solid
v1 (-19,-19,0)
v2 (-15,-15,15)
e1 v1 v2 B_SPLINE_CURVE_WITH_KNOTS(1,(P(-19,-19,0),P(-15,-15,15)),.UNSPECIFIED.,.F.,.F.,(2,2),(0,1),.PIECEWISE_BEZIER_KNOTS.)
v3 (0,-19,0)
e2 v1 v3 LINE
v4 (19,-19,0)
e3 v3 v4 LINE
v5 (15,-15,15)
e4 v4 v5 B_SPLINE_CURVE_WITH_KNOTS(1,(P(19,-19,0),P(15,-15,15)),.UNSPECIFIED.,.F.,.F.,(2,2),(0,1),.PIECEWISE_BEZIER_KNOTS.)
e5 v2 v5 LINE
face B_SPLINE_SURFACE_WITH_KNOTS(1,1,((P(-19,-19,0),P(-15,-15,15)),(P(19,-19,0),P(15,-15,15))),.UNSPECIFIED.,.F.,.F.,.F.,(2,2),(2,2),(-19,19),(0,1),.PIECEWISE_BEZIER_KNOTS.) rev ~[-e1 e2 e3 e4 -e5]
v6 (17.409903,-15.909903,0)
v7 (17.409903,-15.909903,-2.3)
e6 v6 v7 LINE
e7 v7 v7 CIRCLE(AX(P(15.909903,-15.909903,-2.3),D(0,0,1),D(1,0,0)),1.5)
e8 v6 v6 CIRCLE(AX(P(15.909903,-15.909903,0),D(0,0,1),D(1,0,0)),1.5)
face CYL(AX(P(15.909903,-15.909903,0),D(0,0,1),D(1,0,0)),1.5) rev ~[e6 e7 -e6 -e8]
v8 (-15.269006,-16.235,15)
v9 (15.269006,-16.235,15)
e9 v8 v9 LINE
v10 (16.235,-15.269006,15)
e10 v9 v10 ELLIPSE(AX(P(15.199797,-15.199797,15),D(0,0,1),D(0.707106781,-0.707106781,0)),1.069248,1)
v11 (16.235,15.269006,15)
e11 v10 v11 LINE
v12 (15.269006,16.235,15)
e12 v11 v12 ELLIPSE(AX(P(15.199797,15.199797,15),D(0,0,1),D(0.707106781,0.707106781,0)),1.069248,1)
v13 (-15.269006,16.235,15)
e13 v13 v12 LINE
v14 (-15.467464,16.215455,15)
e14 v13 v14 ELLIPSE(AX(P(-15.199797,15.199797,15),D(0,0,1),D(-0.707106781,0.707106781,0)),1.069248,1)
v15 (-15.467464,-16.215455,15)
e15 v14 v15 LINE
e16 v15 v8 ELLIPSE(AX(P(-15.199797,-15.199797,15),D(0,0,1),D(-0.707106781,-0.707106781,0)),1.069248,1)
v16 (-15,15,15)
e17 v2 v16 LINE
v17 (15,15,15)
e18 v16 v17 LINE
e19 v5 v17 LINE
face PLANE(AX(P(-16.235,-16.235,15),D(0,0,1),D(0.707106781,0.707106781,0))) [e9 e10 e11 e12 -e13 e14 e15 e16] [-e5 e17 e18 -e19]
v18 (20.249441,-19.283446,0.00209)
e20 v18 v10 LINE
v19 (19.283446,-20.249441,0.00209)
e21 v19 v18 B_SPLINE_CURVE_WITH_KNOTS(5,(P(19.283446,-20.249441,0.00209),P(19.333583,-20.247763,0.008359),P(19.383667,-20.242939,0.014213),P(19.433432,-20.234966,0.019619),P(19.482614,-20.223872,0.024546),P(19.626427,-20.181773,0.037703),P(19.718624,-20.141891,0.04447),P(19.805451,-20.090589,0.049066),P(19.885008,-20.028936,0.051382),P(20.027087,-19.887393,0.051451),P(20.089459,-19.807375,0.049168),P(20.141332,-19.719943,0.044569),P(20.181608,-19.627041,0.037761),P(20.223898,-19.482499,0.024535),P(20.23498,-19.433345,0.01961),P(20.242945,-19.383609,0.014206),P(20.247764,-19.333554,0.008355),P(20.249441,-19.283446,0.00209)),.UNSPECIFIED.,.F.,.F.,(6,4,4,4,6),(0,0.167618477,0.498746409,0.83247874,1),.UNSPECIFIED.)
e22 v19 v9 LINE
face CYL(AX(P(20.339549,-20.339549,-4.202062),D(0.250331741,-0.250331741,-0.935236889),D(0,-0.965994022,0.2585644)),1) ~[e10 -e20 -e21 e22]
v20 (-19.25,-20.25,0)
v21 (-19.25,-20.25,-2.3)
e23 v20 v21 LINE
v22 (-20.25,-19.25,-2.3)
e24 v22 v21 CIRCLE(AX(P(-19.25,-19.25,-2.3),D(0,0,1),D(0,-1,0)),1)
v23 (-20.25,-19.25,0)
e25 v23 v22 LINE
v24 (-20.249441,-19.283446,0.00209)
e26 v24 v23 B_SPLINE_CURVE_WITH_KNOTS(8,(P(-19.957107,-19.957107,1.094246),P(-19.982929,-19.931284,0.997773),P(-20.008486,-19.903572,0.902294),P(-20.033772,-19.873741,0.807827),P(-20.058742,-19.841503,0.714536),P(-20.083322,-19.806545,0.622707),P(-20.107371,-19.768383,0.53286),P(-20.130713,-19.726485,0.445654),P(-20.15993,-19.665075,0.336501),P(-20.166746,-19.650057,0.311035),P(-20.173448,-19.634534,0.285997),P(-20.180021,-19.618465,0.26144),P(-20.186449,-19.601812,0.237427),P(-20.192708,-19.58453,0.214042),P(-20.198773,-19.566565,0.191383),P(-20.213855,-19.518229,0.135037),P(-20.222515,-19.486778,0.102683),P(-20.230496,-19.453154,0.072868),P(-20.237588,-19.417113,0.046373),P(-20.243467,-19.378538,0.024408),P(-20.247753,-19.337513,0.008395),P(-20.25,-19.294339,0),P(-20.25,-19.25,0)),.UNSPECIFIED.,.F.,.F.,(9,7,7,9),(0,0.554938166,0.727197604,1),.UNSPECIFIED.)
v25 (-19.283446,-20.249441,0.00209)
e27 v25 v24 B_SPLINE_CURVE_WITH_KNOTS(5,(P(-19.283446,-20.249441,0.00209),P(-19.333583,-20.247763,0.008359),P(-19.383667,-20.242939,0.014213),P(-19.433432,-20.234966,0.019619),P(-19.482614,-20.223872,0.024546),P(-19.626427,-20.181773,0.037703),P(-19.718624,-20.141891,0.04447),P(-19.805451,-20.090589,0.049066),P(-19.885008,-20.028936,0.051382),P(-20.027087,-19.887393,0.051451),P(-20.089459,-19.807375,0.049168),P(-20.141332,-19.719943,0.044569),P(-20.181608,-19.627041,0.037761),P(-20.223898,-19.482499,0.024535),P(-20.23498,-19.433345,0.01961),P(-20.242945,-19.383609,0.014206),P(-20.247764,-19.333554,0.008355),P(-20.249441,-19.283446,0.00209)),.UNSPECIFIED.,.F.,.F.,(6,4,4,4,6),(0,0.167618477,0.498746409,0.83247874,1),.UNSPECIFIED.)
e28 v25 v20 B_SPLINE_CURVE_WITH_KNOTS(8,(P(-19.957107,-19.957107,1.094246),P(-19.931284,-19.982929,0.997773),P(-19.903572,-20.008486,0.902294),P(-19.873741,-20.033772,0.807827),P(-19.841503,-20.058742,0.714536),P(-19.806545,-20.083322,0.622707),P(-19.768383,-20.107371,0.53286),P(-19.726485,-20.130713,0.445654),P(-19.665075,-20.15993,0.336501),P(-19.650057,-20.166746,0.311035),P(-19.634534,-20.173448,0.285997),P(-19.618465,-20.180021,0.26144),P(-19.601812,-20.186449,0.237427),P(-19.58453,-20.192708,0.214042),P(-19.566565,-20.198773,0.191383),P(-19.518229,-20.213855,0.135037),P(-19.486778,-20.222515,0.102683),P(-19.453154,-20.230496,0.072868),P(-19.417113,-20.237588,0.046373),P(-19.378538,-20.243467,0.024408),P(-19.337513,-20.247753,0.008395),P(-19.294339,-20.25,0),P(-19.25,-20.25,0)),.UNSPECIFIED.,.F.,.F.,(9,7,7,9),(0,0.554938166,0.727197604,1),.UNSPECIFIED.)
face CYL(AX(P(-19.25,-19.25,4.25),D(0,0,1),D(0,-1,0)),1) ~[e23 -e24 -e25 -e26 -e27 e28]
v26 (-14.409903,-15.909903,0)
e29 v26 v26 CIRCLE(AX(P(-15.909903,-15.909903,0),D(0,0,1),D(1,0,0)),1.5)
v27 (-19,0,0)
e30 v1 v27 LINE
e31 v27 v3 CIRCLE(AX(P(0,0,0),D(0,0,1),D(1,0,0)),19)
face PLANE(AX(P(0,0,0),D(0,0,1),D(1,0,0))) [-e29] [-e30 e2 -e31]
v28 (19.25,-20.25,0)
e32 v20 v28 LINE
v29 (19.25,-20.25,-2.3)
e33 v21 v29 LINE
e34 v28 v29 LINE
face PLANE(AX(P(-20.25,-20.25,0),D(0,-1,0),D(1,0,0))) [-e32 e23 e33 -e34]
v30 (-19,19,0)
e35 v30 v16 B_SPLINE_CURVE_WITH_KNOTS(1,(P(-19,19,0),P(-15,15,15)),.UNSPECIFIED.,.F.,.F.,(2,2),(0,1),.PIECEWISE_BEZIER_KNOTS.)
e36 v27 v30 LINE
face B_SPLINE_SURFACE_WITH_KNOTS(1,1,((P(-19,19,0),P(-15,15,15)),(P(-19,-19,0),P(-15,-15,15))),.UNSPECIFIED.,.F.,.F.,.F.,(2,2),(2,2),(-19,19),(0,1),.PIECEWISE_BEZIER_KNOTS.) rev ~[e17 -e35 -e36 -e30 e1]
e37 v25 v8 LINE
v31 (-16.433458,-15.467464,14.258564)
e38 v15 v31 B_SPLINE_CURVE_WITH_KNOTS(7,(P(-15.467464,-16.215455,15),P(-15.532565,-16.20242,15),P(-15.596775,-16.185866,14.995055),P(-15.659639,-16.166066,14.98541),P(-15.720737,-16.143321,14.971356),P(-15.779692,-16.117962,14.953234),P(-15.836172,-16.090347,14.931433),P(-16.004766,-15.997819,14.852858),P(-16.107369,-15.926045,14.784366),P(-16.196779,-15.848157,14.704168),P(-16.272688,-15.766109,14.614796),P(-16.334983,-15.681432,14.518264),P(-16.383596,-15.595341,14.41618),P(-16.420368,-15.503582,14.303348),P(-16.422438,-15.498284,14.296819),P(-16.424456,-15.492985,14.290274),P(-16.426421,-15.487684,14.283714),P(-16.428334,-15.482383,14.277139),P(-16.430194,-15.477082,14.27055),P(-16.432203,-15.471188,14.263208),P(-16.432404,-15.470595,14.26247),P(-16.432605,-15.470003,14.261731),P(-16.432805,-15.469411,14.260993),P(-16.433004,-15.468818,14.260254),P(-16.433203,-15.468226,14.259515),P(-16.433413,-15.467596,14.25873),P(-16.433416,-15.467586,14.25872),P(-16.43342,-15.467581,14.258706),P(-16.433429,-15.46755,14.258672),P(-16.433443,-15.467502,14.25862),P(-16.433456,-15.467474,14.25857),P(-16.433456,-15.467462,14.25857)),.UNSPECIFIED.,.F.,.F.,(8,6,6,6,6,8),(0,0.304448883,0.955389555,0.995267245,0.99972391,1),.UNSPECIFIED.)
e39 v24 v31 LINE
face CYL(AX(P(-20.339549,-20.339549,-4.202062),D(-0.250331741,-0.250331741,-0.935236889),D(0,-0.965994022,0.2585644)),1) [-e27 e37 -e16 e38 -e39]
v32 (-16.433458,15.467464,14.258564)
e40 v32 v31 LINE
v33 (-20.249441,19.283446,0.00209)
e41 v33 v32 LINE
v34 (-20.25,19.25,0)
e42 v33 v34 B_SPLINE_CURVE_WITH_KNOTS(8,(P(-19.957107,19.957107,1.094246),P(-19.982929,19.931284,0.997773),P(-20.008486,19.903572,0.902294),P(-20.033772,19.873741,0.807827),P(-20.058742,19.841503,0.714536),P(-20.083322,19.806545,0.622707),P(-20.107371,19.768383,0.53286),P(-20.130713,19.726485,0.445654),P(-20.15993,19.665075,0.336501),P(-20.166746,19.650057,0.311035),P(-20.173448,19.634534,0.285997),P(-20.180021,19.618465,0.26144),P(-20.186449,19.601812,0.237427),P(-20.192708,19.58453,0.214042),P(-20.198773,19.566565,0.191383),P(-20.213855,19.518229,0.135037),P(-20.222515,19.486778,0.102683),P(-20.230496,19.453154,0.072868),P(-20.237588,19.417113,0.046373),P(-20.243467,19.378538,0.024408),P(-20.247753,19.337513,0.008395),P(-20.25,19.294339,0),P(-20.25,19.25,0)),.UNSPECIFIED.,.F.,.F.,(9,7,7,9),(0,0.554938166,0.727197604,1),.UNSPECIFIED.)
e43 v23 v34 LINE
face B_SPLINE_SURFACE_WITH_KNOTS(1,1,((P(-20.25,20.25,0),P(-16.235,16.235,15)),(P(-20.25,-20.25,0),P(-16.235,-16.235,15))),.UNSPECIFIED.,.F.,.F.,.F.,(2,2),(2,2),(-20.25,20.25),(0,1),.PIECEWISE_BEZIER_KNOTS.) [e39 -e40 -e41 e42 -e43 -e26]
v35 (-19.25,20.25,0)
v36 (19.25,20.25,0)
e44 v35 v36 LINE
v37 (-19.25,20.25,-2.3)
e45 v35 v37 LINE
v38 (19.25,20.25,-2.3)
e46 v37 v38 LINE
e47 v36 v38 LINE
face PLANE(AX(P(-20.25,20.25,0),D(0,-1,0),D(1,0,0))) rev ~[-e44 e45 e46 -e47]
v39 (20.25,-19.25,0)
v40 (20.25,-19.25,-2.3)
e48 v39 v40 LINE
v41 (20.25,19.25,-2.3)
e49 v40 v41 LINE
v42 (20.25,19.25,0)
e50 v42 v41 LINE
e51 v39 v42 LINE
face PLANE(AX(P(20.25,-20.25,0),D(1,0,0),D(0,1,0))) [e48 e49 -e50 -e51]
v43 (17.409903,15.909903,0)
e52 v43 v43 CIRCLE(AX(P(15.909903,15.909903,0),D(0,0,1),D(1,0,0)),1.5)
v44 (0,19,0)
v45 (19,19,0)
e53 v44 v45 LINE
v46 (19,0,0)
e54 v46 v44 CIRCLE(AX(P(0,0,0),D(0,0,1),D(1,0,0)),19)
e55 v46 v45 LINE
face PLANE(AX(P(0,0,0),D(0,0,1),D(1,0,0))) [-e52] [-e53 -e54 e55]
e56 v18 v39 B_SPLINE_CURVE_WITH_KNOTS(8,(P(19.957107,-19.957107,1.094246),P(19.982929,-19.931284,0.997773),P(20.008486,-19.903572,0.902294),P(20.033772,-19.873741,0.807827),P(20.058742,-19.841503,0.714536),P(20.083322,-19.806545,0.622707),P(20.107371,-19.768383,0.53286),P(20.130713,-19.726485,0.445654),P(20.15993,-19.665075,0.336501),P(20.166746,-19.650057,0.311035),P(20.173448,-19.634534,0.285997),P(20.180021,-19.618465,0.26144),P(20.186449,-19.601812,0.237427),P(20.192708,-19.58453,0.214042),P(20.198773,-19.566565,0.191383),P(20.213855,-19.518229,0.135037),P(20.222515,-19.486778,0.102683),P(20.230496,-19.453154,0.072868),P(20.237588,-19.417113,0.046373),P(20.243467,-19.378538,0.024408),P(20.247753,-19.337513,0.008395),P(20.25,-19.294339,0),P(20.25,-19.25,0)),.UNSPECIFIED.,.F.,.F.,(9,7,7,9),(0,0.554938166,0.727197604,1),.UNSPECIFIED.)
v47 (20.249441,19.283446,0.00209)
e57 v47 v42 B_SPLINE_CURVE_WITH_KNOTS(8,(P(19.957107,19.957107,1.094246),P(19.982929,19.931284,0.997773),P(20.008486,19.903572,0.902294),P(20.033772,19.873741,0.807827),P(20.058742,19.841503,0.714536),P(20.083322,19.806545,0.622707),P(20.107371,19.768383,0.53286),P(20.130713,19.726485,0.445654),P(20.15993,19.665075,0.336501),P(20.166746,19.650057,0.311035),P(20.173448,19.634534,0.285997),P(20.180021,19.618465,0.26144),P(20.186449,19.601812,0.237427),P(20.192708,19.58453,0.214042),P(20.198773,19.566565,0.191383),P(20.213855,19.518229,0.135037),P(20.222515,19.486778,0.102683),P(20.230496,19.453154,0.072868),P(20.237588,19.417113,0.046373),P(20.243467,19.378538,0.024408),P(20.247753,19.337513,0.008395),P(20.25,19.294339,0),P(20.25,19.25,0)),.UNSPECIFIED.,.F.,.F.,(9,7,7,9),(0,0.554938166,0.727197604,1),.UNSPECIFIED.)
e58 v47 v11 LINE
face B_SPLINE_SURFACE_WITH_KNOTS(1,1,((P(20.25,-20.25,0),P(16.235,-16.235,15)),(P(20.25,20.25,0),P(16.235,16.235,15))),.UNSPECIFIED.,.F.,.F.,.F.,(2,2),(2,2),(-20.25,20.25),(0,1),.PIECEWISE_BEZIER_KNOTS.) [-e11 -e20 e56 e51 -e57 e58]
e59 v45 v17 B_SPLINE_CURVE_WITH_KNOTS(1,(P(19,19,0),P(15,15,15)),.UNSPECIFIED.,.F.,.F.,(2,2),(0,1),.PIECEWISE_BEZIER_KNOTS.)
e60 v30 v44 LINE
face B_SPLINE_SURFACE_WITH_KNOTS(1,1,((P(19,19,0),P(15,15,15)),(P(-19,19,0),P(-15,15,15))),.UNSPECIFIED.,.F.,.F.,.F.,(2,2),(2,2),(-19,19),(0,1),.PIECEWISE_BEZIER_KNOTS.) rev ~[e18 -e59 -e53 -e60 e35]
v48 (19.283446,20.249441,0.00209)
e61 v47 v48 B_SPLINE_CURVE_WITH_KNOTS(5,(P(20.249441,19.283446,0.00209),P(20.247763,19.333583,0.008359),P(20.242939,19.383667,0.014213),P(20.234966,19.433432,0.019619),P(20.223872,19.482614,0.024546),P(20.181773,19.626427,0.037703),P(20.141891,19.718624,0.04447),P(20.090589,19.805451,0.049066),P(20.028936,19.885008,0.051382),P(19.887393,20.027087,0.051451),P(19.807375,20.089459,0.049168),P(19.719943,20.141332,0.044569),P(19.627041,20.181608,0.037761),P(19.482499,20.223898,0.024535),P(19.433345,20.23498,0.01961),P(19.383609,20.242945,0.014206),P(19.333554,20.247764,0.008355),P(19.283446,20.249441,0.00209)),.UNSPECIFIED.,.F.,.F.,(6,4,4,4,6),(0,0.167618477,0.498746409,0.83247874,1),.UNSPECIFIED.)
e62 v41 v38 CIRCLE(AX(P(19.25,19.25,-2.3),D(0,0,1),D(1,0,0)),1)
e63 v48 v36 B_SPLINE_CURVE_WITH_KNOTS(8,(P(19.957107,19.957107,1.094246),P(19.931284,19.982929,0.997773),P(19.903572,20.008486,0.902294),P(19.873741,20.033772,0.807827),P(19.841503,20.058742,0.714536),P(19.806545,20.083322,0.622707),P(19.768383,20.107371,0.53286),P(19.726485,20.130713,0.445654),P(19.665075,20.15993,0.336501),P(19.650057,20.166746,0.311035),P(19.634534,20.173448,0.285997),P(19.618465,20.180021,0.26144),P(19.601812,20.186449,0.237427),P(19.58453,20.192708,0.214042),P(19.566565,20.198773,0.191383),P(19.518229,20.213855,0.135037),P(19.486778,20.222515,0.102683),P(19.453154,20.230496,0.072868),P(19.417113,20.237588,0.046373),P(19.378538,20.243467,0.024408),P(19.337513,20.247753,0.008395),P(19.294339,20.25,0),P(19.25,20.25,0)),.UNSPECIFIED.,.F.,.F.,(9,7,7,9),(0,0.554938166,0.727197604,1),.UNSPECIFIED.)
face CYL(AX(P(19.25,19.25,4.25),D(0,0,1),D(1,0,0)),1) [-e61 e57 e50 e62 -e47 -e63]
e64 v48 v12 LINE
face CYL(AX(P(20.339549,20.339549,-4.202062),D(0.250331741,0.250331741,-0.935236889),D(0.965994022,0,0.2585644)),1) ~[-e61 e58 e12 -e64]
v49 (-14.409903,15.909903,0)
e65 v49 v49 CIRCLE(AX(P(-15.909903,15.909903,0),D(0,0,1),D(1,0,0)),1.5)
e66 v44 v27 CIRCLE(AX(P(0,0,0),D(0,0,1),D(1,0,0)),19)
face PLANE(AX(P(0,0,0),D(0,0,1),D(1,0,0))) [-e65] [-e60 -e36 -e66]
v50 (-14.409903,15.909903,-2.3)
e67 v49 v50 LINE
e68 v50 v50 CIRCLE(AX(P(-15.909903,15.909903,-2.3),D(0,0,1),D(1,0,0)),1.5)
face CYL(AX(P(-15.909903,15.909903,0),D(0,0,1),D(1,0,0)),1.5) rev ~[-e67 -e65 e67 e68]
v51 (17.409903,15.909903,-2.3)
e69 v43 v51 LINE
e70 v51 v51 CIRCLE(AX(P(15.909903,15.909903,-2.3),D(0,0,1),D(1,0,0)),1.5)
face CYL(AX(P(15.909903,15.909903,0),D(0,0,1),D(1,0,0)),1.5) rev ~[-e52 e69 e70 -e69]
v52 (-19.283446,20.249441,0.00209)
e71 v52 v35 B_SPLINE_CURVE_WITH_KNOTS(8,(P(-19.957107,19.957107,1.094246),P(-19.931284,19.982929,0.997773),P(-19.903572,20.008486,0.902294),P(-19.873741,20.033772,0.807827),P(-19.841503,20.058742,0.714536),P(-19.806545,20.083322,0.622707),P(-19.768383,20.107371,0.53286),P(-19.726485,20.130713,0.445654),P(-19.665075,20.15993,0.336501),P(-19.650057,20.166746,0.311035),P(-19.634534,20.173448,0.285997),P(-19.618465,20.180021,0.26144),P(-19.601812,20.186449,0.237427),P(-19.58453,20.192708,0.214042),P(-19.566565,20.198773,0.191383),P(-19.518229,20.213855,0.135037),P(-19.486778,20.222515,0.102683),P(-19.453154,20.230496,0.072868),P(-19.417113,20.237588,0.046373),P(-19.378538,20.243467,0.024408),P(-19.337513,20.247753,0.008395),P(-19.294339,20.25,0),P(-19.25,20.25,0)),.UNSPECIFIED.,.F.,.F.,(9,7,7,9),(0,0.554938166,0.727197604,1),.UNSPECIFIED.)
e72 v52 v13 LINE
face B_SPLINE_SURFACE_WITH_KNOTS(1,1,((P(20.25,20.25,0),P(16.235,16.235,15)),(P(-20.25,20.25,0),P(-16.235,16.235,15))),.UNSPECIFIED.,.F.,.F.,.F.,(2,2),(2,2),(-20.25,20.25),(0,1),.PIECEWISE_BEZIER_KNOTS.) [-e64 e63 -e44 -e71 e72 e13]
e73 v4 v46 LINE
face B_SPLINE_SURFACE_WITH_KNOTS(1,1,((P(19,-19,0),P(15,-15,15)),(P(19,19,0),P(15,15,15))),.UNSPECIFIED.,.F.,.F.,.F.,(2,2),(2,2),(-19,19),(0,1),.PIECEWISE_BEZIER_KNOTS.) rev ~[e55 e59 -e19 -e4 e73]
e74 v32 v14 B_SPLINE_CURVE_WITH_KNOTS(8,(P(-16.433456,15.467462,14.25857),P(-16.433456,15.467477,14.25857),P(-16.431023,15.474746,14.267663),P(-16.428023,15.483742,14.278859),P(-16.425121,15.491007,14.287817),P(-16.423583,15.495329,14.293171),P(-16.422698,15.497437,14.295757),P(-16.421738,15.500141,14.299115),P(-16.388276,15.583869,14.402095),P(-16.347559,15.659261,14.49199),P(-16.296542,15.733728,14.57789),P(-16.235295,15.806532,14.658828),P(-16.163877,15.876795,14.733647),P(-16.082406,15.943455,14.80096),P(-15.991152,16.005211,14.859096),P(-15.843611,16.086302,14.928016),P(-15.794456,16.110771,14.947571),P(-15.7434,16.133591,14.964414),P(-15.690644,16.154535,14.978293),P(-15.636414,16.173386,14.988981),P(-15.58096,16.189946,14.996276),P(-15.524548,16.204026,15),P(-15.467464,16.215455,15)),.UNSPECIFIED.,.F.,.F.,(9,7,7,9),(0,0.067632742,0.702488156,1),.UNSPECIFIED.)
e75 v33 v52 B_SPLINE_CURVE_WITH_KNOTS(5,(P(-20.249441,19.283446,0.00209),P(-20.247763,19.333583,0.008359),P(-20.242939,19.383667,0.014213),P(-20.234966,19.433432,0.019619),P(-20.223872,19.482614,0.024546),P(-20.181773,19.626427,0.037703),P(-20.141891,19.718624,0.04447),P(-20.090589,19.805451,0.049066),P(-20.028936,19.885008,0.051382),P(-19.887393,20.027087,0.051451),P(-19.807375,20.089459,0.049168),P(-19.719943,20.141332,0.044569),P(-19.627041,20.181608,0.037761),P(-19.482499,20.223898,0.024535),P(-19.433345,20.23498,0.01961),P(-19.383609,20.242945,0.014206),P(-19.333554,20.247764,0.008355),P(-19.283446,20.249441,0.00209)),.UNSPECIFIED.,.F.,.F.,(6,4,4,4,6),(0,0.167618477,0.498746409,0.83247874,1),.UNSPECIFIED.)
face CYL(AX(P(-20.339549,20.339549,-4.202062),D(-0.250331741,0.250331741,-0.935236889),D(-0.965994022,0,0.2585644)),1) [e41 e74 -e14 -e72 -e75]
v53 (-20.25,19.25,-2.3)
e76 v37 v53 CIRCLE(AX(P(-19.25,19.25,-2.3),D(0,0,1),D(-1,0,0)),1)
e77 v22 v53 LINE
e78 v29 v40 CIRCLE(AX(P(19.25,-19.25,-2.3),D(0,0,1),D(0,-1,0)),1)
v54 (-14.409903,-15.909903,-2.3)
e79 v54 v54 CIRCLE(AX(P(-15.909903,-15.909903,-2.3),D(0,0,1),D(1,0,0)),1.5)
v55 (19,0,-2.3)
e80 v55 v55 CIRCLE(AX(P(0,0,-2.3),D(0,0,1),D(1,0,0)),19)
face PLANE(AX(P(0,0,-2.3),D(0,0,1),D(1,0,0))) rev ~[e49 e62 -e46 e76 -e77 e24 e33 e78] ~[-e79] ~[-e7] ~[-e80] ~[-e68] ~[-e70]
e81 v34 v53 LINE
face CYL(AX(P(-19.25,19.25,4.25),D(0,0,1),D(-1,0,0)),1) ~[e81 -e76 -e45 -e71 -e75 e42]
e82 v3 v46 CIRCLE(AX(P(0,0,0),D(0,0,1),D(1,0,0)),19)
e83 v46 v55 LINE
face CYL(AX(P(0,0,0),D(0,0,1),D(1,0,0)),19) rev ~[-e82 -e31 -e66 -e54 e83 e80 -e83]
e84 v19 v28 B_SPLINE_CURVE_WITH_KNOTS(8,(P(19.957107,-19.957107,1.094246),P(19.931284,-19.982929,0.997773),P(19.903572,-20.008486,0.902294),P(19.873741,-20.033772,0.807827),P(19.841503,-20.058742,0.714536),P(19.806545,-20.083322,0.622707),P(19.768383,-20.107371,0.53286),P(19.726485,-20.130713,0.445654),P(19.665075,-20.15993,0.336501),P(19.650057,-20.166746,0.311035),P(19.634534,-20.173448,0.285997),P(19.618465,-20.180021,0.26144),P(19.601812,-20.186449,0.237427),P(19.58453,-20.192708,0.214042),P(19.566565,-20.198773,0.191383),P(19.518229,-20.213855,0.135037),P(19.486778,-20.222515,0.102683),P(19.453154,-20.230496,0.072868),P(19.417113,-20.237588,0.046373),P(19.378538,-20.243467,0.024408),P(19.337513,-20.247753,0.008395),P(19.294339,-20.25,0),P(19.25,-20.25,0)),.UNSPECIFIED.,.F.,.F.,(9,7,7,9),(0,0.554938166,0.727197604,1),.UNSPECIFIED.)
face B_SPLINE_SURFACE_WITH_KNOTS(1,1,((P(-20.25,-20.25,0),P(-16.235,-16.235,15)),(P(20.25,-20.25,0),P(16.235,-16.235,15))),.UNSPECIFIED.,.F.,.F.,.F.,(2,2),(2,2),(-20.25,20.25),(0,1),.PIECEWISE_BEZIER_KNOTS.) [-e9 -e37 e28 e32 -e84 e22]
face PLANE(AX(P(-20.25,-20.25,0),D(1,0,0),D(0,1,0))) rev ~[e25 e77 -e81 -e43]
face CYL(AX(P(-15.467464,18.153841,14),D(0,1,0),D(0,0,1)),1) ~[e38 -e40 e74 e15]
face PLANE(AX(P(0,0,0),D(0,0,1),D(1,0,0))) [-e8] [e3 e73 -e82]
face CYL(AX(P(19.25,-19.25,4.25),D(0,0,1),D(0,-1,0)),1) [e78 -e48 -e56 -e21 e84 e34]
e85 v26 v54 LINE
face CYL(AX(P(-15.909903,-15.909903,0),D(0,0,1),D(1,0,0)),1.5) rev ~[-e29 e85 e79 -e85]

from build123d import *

# Parameters (mm, degrees)
F0_W         = 40.5
F0_H         = 40.5
F2_W         = 32.47
F2_H         = 32.47
F4_W         = 38
F4_H         = 38
F5_W         = 30
F5_H         = 30
F7_W         = 40.5
F7_H         = 40.5
F7_R         = 1.5
F7_R_2       = 19
F8_DEPTH     = 2.3
F9_T3_DEPTH  = 22.3515662211
F9_T6_DEPTH  = 9.05
F9_T9_DEPTH  = 9.05
F9_T12_DEPTH = 22.3515662211
F9_T15_DEPTH = 22.3515662211
F9_T18_DEPTH = 9.05
F9_T21_DEPTH = 22.3515662211
F9_T24_DEPTH = 9.05
F9_T27_DEPTH = 36.3076821333


# Not quite as in the source:
# - a fillet or chamfer that OpenCascade refuses, or shapes differently, is made with other operations: its cross-section is extruded or revolved along the edge and cut away or added


with BuildPart() as f3:
    # F0 (on Top) → F3 section 0
    with BuildSketch(Plane.XY):
        Rectangle(F0_W, F0_H)
    # F2 (on offset) → F3 section 1
    with BuildSketch(Plane.XY.offset(15)):
        Rectangle(F2_W, F2_H)
    loft()

    # F4 (on face) → F6 section 0
    with BuildSketch(Plane.XY):
        Rectangle(F4_W, F4_H)
    # F5 (on face) → F6 section 1
    with BuildSketch(Plane.XY.offset(15)):
        Rectangle(F5_W, F5_H)
    loft(mode=Mode.SUBTRACT)

    # F7 (on face) → F8 (join)
    with BuildSketch(Plane.XY):
        Rectangle(F7_W, F7_H)
        with Locations((-15.9099025767, -15.9099025767)):
            Circle(F7_R, mode=Mode.SUBTRACT)
        with Locations((15.9099025767, -15.9099025767)):
            Circle(F7_R, mode=Mode.SUBTRACT)
        with Locations((-15.9099025767, 15.9099025767)):
            Circle(F7_R, mode=Mode.SUBTRACT)
        Circle(F7_R_2, mode=Mode.SUBTRACT)
        with Locations((15.9099025767, 15.9099025767)):
            Circle(F7_R, mode=Mode.SUBTRACT)
    extrude(amount=-F8_DEPTH)

    # F9: fillet of radius 1 on 9 edges, made by hand


with BuildPart() as f9_tool1:
    # F9_s2 → F9_t3 (new body)
    with BuildSketch(Plane(origin=(-3.5329799901, -3.5329799901, -13.1991780453), x_dir=(-0.7071067812, 0.7071067812, 0), z_dir=(0.2503317407, 0.2503317407, 0.9352368893))):
        with BuildLine():
            ThreePointArc((-0.6830609237, 26.1443262584), (0, 26.4139648585), (0.6830609237, 26.1443262584))
            Line((0.6830609237, 26.1443262584), (0, 26.783150032))
            Line((0, 26.783150032), (-0.6830609237, 26.1443262584))
        make_face()
    extrude(amount=F9_T3_DEPTH)


with BuildPart() as f9_tool4:
    # F9_s5 → F9_t6 (new body)
    with BuildSketch(Plane.XY.offset(4.25)):
        with BuildLine():
            ThreePointArc((-19.25, -20.25), (-19.9571067812, -19.9571067812), (-20.25, -19.25))
            Line((-20.25, -19.25), (-20.25, -20.25))
            Line((-20.25, -20.25), (-19.25, -20.25))
        make_face()
    extrude(amount=-F9_T6_DEPTH)


with BuildPart() as f9_tool7:
    # F9_s8 → F9_t9 (new body)
    with BuildSketch(Plane.XY.offset(4.25)):
        with BuildLine():
            ThreePointArc((-20.25, 19.25), (-19.9571067812, 19.9571067812), (-19.25, 20.25))
            Line((-19.25, 20.25), (-20.25, 20.25))
            Line((-20.25, 20.25), (-20.25, 19.25))
        make_face()
    extrude(amount=-F9_T9_DEPTH)


with BuildPart() as f9_tool10:
    # F9_s11 → F9_t12 (new body)
    with BuildSketch(Plane(origin=(-3.5329799901, 3.5329799901, -13.1991780453), x_dir=(0.7071067812, 0.7071067812, 0), z_dir=(0.2503317407, -0.2503317407, 0.9352368893))):
        with BuildLine():
            ThreePointArc((-0.6830609237, 26.1443262584), (0, 26.4139648585), (0.6830609237, 26.1443262584))
            Line((0.6830609237, 26.1443262584), (0, 26.783150032))
            Line((0, 26.783150032), (-0.6830609237, 26.1443262584))
        make_face()
    extrude(amount=F9_T12_DEPTH)


with BuildPart() as f9_tool13:
    # F9_s14 → F9_t15 (new body)
    with BuildSketch(Plane(origin=(3.5329799901, 3.5329799901, -13.1991780453), x_dir=(0.7071067812, -0.7071067812, 0), z_dir=(-0.2503317407, -0.2503317407, 0.9352368893))):
        with BuildLine():
            ThreePointArc((0.6830609237, 26.1443262584), (0, 26.4139648585), (-0.6830609237, 26.1443262584))
            Line((-0.6830609237, 26.1443262584), (0, 26.783150032))
            Line((0, 26.783150032), (0.6830609237, 26.1443262584))
        make_face()
    extrude(amount=F9_T15_DEPTH)


with BuildPart() as f9_tool16:
    # F9_s17 → F9_t18 (new body)
    with BuildSketch(Plane.XY.offset(4.25)):
        with BuildLine():
            ThreePointArc((20.25, 19.25), (19.9571067812, 19.9571067812), (19.25, 20.25))
            Line((19.25, 20.25), (20.25, 20.25))
            Line((20.25, 20.25), (20.25, 19.25))
        make_face()
    extrude(amount=-F9_T18_DEPTH)


with BuildPart() as f9_tool19:
    # F9_s20 → F9_t21 (new body)
    with BuildSketch(Plane(origin=(3.5329799901, -3.5329799901, -13.1991780453), x_dir=(-0.7071067812, -0.7071067812, 0), z_dir=(-0.2503317407, 0.2503317407, 0.9352368893))):
        with BuildLine():
            ThreePointArc((0.6830609237, 26.1443262584), (0, 26.4139648585), (-0.6830609237, 26.1443262584))
            Line((-0.6830609237, 26.1443262584), (0, 26.783150032))
            Line((0, 26.783150032), (0.6830609237, 26.1443262584))
        make_face()
    extrude(amount=F9_T21_DEPTH)


with BuildPart() as f9_tool22:
    # F9_s23 → F9_t24 (new body)
    with BuildSketch(Plane.XY.offset(4.25)):
        with BuildLine():
            ThreePointArc((19.25, -20.25), (19.9571067812, -19.9571067812), (20.25, -19.25))
            Line((20.25, -19.25), (20.25, -20.25))
            Line((20.25, -20.25), (19.25, -20.25))
        make_face()
    extrude(amount=-F9_T24_DEPTH)


with BuildPart() as f9_tool25:
    # F9_s26 → F9_t27 (new body)
    with BuildSketch(Plane.XZ.offset(-18.1538410667)):
        with BuildLine():
            ThreePointArc((-15.4674635733, 15), (-16.0763295685, 14.7932730929), (-16.4334575956, 14.2585644))
            Line((-16.4334575956, 14.2585644), (-16.235, 15))
            Line((-16.235, 15), (-15.4674635733, 15))
        make_face()
    extrude(amount=F9_T27_DEPTH)


with BuildPart() as f3_1:
    add(f3.part)

    # F9_t28: cut F9_tool1, F9_tool4, F9_tool7, F9_tool10, F9_tool13, F9_tool16, F9_tool19, F9_tool22, F9_tool25
    add([f9_tool1.part, f9_tool4.part, f9_tool7.part, f9_tool10.part, f9_tool13.part, f9_tool16.part, f9_tool19.part, f9_tool22.part, f9_tool25.part], mode=Mode.SUBTRACT)


solid = f3_1.part
